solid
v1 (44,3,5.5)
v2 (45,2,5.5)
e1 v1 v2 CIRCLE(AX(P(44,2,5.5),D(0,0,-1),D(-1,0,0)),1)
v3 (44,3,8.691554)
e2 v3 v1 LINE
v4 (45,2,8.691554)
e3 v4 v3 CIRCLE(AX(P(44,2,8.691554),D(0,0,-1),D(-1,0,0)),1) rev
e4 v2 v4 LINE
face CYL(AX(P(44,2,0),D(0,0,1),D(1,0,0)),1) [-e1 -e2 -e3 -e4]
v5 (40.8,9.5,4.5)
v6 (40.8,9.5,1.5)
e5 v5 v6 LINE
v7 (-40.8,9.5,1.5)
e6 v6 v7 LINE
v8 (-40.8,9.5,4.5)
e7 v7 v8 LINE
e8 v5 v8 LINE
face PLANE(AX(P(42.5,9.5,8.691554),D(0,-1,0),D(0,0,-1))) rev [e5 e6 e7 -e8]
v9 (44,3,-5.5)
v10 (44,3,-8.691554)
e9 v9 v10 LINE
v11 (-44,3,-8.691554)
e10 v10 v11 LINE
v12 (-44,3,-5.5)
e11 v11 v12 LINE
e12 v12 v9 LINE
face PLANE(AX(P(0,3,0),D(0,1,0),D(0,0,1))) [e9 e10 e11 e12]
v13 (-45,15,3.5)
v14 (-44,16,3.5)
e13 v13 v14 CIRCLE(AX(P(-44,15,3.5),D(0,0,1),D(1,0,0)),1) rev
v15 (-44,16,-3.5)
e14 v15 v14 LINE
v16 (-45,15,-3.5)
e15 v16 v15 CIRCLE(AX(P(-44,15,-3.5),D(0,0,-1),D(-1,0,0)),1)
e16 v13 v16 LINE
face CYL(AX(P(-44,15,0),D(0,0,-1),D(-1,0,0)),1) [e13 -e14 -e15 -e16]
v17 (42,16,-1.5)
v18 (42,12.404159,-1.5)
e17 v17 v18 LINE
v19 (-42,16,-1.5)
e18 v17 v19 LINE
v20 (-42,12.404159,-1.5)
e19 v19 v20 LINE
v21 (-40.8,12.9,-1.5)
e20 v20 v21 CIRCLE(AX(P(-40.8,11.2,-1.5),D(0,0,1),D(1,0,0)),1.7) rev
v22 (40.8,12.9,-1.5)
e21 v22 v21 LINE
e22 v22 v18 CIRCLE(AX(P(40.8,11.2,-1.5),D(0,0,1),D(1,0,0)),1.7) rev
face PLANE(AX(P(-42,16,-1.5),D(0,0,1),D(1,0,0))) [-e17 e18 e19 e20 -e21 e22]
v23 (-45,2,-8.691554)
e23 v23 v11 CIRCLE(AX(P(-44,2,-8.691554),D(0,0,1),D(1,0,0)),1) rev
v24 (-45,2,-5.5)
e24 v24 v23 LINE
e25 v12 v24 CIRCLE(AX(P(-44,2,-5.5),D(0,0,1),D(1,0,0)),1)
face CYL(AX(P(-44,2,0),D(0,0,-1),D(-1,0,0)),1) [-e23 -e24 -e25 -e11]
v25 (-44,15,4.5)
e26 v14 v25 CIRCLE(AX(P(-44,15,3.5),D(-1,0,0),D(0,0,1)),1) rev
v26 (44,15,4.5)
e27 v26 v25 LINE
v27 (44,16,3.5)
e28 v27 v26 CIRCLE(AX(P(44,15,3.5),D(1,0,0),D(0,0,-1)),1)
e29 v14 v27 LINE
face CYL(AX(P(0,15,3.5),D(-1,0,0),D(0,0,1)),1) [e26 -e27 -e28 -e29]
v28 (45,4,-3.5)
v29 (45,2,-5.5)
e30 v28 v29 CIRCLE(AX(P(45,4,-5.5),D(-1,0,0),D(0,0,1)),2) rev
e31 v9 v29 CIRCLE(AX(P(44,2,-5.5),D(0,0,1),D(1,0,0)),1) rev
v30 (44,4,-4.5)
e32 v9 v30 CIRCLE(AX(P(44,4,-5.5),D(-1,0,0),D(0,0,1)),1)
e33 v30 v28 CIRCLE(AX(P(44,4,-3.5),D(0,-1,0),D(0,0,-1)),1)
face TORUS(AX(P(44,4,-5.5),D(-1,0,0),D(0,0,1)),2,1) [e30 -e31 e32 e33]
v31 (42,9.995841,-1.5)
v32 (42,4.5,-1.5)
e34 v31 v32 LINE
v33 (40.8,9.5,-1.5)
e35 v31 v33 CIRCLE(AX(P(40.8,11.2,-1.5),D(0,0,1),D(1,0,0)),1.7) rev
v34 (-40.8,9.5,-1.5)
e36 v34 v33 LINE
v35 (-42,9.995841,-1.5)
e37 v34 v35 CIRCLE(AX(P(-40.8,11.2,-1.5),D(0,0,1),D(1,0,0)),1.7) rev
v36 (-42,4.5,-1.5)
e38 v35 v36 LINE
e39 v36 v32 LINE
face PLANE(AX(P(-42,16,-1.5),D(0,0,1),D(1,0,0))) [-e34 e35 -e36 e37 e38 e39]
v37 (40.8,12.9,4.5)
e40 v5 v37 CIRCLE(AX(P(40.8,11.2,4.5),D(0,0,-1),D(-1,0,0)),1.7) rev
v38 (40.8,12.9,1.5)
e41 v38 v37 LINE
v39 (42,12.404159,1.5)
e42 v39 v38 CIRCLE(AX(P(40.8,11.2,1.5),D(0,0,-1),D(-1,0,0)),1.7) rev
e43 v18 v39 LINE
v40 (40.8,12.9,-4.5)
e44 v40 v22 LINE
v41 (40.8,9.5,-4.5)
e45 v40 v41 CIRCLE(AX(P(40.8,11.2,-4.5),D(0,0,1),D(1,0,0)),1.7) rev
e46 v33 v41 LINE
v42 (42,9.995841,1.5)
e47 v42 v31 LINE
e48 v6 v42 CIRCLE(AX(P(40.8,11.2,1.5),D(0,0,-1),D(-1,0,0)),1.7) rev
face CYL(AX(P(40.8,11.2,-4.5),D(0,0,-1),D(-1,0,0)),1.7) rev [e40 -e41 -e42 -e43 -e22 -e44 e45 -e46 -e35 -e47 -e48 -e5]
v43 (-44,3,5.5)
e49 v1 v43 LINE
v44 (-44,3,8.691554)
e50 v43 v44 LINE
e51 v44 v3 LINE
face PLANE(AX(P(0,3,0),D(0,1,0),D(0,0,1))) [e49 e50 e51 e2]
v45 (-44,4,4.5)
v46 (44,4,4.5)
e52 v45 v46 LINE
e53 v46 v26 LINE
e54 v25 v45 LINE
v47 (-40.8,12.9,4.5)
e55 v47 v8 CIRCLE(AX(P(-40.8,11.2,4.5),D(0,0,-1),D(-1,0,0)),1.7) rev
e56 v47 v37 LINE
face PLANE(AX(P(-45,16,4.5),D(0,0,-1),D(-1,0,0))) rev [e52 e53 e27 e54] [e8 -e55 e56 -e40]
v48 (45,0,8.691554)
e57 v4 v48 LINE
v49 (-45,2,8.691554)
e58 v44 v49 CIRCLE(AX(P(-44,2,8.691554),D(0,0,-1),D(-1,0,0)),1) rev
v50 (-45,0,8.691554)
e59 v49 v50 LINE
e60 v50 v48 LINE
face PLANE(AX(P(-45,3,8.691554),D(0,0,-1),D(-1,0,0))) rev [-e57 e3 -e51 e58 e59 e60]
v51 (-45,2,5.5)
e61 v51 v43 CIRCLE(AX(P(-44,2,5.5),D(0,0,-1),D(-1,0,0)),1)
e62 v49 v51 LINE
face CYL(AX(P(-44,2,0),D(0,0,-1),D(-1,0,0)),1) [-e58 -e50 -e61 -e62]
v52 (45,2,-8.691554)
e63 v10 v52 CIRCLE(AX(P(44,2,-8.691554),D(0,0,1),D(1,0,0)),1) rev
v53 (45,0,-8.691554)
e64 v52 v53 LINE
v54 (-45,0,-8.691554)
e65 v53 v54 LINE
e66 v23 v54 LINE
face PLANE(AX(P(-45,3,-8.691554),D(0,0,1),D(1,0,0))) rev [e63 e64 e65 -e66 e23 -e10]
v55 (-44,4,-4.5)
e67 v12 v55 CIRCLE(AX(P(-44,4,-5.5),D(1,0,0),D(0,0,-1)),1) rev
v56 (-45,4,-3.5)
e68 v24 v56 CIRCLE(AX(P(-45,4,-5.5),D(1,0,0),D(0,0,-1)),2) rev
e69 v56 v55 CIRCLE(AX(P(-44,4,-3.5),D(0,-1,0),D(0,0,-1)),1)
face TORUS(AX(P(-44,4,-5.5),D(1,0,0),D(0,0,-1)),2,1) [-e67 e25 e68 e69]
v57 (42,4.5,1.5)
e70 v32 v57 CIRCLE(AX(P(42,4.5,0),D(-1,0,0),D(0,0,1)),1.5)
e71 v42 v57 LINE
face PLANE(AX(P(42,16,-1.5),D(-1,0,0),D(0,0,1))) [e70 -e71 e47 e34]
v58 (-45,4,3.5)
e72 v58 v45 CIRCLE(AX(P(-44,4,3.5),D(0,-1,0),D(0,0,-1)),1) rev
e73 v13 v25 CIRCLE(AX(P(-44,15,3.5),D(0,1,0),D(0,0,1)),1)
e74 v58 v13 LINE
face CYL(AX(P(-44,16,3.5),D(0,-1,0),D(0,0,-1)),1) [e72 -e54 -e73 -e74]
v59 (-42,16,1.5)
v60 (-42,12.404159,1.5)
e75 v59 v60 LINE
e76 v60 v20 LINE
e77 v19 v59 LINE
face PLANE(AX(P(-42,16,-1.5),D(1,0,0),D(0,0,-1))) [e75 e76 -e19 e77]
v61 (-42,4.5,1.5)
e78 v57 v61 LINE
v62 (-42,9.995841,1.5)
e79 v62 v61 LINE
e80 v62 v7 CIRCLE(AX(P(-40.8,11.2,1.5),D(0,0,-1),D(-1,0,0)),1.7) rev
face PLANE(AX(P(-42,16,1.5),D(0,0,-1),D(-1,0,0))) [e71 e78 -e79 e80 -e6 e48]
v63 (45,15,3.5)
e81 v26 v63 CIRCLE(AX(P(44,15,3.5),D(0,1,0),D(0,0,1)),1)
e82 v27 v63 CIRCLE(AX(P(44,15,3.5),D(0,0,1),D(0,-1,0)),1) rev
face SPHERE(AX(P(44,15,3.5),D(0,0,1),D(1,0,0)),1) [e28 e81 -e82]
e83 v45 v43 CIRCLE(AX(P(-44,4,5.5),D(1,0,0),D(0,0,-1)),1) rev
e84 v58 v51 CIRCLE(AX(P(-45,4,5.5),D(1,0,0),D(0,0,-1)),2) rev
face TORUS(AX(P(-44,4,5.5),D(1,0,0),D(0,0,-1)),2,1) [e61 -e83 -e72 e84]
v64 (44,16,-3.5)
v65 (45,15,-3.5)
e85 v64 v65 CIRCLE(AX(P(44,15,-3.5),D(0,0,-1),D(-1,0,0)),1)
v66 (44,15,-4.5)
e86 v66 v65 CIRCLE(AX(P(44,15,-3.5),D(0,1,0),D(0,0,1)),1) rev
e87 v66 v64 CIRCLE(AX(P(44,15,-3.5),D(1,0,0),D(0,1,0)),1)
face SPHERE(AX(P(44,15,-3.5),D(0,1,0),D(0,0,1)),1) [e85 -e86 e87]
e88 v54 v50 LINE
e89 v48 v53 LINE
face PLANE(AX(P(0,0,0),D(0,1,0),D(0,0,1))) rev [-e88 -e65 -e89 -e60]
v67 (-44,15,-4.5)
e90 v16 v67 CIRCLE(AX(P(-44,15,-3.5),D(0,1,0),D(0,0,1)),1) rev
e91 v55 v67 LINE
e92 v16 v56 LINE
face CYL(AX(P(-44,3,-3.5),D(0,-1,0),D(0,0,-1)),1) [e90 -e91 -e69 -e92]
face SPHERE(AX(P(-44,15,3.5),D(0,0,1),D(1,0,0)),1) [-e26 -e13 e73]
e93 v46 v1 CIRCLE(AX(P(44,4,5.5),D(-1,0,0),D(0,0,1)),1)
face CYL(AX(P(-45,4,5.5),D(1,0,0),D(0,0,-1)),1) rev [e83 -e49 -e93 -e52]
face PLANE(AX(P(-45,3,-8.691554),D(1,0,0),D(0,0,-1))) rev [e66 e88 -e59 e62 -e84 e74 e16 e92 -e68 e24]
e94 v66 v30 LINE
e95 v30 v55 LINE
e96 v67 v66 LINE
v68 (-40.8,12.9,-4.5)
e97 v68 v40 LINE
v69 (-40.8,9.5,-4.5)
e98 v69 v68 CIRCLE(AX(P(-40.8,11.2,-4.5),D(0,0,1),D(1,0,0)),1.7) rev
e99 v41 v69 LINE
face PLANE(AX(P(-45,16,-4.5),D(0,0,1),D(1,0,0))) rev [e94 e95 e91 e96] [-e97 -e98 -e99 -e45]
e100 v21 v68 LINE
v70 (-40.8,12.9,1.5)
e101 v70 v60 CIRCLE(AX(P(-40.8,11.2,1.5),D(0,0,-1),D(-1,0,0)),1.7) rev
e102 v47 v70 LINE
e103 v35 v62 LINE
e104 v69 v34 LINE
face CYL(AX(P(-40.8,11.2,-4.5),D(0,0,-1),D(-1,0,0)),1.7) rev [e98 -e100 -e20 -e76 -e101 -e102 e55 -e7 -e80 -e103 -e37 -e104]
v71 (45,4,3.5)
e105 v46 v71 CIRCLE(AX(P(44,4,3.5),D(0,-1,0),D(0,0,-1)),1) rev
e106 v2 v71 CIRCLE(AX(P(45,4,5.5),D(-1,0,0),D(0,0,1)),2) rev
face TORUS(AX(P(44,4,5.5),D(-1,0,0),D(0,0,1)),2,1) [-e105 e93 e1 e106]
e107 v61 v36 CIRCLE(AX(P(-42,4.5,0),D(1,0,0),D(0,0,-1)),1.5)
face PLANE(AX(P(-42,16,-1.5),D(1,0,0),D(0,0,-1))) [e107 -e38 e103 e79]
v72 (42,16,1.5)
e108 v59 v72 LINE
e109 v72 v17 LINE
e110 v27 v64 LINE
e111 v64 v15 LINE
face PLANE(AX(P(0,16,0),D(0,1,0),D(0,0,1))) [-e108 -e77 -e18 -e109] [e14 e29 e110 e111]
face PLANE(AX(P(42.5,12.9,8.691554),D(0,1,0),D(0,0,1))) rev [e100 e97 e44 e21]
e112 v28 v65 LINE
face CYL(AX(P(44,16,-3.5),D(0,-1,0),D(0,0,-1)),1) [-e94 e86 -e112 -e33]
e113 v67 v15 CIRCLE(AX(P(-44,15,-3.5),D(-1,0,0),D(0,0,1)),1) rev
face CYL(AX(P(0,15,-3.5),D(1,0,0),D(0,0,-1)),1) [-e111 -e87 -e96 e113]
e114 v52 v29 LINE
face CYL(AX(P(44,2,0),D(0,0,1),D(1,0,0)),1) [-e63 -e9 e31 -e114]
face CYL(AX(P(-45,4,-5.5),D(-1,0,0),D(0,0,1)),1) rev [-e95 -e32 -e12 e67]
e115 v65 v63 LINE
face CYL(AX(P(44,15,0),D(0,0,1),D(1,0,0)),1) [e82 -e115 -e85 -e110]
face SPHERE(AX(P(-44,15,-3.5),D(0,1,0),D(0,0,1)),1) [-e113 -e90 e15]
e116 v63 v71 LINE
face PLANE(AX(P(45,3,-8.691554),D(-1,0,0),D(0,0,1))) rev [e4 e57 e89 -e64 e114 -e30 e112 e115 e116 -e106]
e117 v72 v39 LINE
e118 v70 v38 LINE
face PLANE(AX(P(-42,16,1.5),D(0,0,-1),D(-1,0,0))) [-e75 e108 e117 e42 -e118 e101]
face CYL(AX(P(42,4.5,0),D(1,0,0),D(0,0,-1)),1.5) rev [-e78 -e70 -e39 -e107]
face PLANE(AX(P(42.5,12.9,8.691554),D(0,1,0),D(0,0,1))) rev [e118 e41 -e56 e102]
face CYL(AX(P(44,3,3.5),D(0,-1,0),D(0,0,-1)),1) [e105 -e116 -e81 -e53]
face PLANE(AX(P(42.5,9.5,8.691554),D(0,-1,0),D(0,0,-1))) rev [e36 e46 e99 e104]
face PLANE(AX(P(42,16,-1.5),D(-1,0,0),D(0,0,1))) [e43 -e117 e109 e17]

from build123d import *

# Parameters (mm, degrees)
SKETCH2_W           = 90
SKETCH2_H           = 17.38310799
BOSS_EXTRUDE1_DEPTH = 3
SKETCH5_W           = 90
SKETCH5_H           = 9
SKETCH5_W_2         = 84
SKETCH5_H_2         = 3
BOSS_EXTRUDE2_DEPTH = 13
SKETCH6_W           = 85
SKETCH6_H           = 3.4
CUT_EXTRUDE1_DEPTH  = 50.548129095
FILLET1_R           = 1.5
FILLET4_R           = 1.7
FILLET5_R           = 1.7
FILLET8_R           = 1


# Some blends are built 0.0001 mm under size
with BuildPart() as part:
    # Sketch2 → Boss-Extrude1 (new body)
    with BuildSketch(Plane(origin=(0, 0, 0), x_dir=(1, 0, 0), z_dir=(0, 1, 0))):
        Rectangle(SKETCH2_W, SKETCH2_H)
    extrude(amount=BOSS_EXTRUDE1_DEPTH)

    # Sketch5 → Boss-Extrude2 (add)
    with BuildSketch(Plane(origin=(0, 3, 0), x_dir=(1, 0, 0), z_dir=(0, 1, 0))):
        Rectangle(SKETCH5_W, SKETCH5_H)
        Rectangle(SKETCH5_W_2, SKETCH5_H_2, mode=Mode.SUBTRACT)
    extrude(amount=BOSS_EXTRUDE2_DEPTH)

    # Sketch6 → Cut-Extrude1 (cut, through all)
    with BuildSketch(Plane(origin=(0, 0, -4.5), x_dir=(-1, 0, 0), z_dir=(0, 0, -1))):
        with Locations((0, 11.2)):
            Rectangle(SKETCH6_W, SKETCH6_H)
    extrude(amount=-CUT_EXTRUDE1_DEPTH, mode=Mode.SUBTRACT)

    # Fillet1
    fillet1_edges = [part.edges().sort_by_distance(p)[0] for p in [
        (0, 3, -1.5),
        (0, 3, 1.5),
    ]]
    fillet(fillet1_edges, radius=FILLET1_R - 0.0001)  # a hair under: the kernel refuses the full size

    # Fillet4
    # the kernel refuses this fillet: 1.7 mm, written as the material it adds along each edge
    with BuildSketch(Plane(origin=(42.5, 9.5, -4.5), x_dir=(-1, 0, 0), z_dir=(0, 0, 1))) as fillet4_piece_1_section:
        with BuildLine():
            CenterArc((FILLET4_R, -FILLET4_R), FILLET4_R, 90, 90)
            Line((0, -FILLET4_R), (0, 0))
            Line((0, 0), (FILLET4_R, 0))
        make_face()
    fillet4_piece_1 = extrude(amount=9, mode=Mode.PRIVATE)
    fillet4_piece_1 = split(fillet4_piece_1, bisect_by=Plane(origin=(41.653565017, 9.615018658, -1.5), z_dir=(0, 0, -1)), keep=Keep.TOP, mode=Mode.PRIVATE)
    fillet4_piece_1 = split(fillet4_piece_1, bisect_by=Plane(origin=(42, 9.615018658, -3), z_dir=(-1, 0, 0)), keep=Keep.TOP, mode=Mode.PRIVATE)
    add(fillet4_piece_1)
    with BuildSketch(Plane(origin=(42.5, 9.5, -4.5), x_dir=(-1, 0, 0), z_dir=(0, 0, 1))) as fillet4_piece_2_section:
        with BuildLine():
            CenterArc((FILLET4_R, -FILLET4_R), FILLET4_R, 90, 90)
            Line((0, -FILLET4_R), (0, 0))
            Line((0, 0), (FILLET4_R, 0))
        make_face()
    fillet4_piece_2 = extrude(amount=9, mode=Mode.PRIVATE)
    fillet4_piece_2 = split(fillet4_piece_2, bisect_by=Plane(origin=(42.31915671, 10.004156927, -1.5), z_dir=(0, 0, -1)), keep=Keep.TOP, mode=Mode.PRIVATE)
    fillet4_piece_2 = split(fillet4_piece_2, bisect_by=Plane(origin=(42, 10.004156927, -3), z_dir=(1, 0, 0)), keep=Keep.TOP, mode=Mode.PRIVATE)
    add(fillet4_piece_2)
    with BuildSketch(Plane(origin=(42.5, 9.5, -4.5), x_dir=(-1, 0, 0), z_dir=(0, 0, 1))) as fillet4_piece_3_section:
        with BuildLine():
            CenterArc((FILLET4_R, -FILLET4_R), FILLET4_R, 90, 90)
            Line((0, -FILLET4_R), (0, 0))
            Line((0, 0), (FILLET4_R, 0))
        make_face()
    fillet4_piece_3 = extrude(amount=9, mode=Mode.PRIVATE)
    fillet4_piece_3 = split(fillet4_piece_3, bisect_by=Plane(origin=(42.31915671, 10.004156927, -1.5), z_dir=(0, 0, 1)), keep=Keep.TOP, mode=Mode.PRIVATE)
    fillet4_piece_3 = split(fillet4_piece_3, bisect_by=Plane(origin=(42.31915671, 10.004156927, 1.5), z_dir=(0, 0, -1)), keep=Keep.TOP, mode=Mode.PRIVATE)
    fillet4_piece_3 = split(fillet4_piece_3, bisect_by=Plane(origin=(42, 10.004156927, 0), z_dir=(1, 0, 0)), keep=Keep.TOP, mode=Mode.PRIVATE)
    add(fillet4_piece_3)
    with BuildSketch(Plane(origin=(42.5, 9.5, -4.5), x_dir=(-1, 0, 0), z_dir=(0, 0, 1))) as fillet4_piece_4_section:
        with BuildLine():
            CenterArc((FILLET4_R, -FILLET4_R), FILLET4_R, 90, 90)
            Line((0, -FILLET4_R), (0, 0))
            Line((0, 0), (FILLET4_R, 0))
        make_face()
    fillet4_piece_4 = extrude(amount=9, mode=Mode.PRIVATE)
    fillet4_piece_4 = split(fillet4_piece_4, bisect_by=Plane(origin=(41.653565017, 9.615018658, 1.5), z_dir=(0, 0, 1)), keep=Keep.TOP, mode=Mode.PRIVATE)
    fillet4_piece_4 = split(fillet4_piece_4, bisect_by=Plane(origin=(42, 9.615018658, 3), z_dir=(-1, 0, 0)), keep=Keep.TOP, mode=Mode.PRIVATE)
    add(fillet4_piece_4)
    with BuildSketch(Plane(origin=(42.5, 9.5, -4.5), x_dir=(-1, 0, 0), z_dir=(0, 0, 1))) as fillet4_piece_5_section:
        with BuildLine():
            CenterArc((FILLET4_R, -FILLET4_R), FILLET4_R, 90, 90)
            Line((0, -FILLET4_R), (0, 0))
            Line((0, 0), (FILLET4_R, 0))
        make_face()
    fillet4_piece_5 = extrude(amount=9, mode=Mode.PRIVATE)
    fillet4_piece_5 = split(fillet4_piece_5, bisect_by=Plane(origin=(42.31915671, 10.004156927, 1.5), z_dir=(0, 0, 1)), keep=Keep.TOP, mode=Mode.PRIVATE)
    fillet4_piece_5 = split(fillet4_piece_5, bisect_by=Plane(origin=(42, 10.004156927, 3), z_dir=(1, 0, 0)), keep=Keep.TOP, mode=Mode.PRIVATE)
    add(fillet4_piece_5)
    with BuildSketch(Plane(origin=(42.5, 12.9, -4.5), x_dir=(0, -1, 0), z_dir=(0, 0, 1))) as fillet4_piece_6_section:
        with BuildLine():
            CenterArc((FILLET4_R, -FILLET4_R), FILLET4_R, 90, 90)
            Line((0, -FILLET4_R), (0, 0))
            Line((0, 0), (FILLET4_R, 0))
        make_face()
    fillet4_piece_6 = extrude(amount=9, mode=Mode.PRIVATE)
    fillet4_piece_6 = split(fillet4_piece_6, bisect_by=Plane(origin=(42.31915671, 12.395843073, -1.5), z_dir=(0, 0, -1)), keep=Keep.TOP, mode=Mode.PRIVATE)
    fillet4_piece_6 = split(fillet4_piece_6, bisect_by=Plane(origin=(42, 12.395843073, -3), z_dir=(1, 0, 0)), keep=Keep.TOP, mode=Mode.PRIVATE)
    add(fillet4_piece_6)
    with BuildSketch(Plane(origin=(42.5, 12.9, -4.5), x_dir=(0, -1, 0), z_dir=(0, 0, 1))) as fillet4_piece_7_section:
        with BuildLine():
            CenterArc((FILLET4_R, -FILLET4_R), FILLET4_R, 90, 90)
            Line((0, -FILLET4_R), (0, 0))
            Line((0, 0), (FILLET4_R, 0))
        make_face()
    fillet4_piece_7 = extrude(amount=9, mode=Mode.PRIVATE)
    fillet4_piece_7 = split(fillet4_piece_7, bisect_by=Plane(origin=(41.653565017, 12.784981342, -1.5), z_dir=(0, 0, -1)), keep=Keep.TOP, mode=Mode.PRIVATE)
    fillet4_piece_7 = split(fillet4_piece_7, bisect_by=Plane(origin=(42, 12.784981342, -3), z_dir=(-1, 0, 0)), keep=Keep.TOP, mode=Mode.PRIVATE)
    add(fillet4_piece_7)
    with BuildSketch(Plane(origin=(42.5, 12.9, -4.5), x_dir=(0, -1, 0), z_dir=(0, 0, 1))) as fillet4_piece_8_section:
        with BuildLine():
            CenterArc((FILLET4_R, -FILLET4_R), FILLET4_R, 90, 90)
            Line((0, -FILLET4_R), (0, 0))
            Line((0, 0), (FILLET4_R, 0))
        make_face()
    fillet4_piece_8 = extrude(amount=9, mode=Mode.PRIVATE)
    fillet4_piece_8 = split(fillet4_piece_8, bisect_by=Plane(origin=(42.31915671, 12.395843073, -1.5), z_dir=(0, 0, 1)), keep=Keep.TOP, mode=Mode.PRIVATE)
    fillet4_piece_8 = split(fillet4_piece_8, bisect_by=Plane(origin=(42, 12.395843073, 0), z_dir=(1, 0, 0)), keep=Keep.TOP, mode=Mode.PRIVATE)
    fillet4_piece_8 = split(fillet4_piece_8, bisect_by=Plane(origin=(42.31915671, 12.395843073, 1.5), z_dir=(0, 0, -1)), keep=Keep.TOP, mode=Mode.PRIVATE)
    add(fillet4_piece_8)
    with BuildSketch(Plane(origin=(42.5, 12.9, -4.5), x_dir=(0, -1, 0), z_dir=(0, 0, 1))) as fillet4_piece_9_section:
        with BuildLine():
            CenterArc((FILLET4_R, -FILLET4_R), FILLET4_R, 90, 90)
            Line((0, -FILLET4_R), (0, 0))
            Line((0, 0), (FILLET4_R, 0))
        make_face()
    fillet4_piece_9 = extrude(amount=9, mode=Mode.PRIVATE)
    fillet4_piece_9 = split(fillet4_piece_9, bisect_by=Plane(origin=(42, 12.395843073, 3), z_dir=(1, 0, 0)), keep=Keep.TOP, mode=Mode.PRIVATE)
    fillet4_piece_9 = split(fillet4_piece_9, bisect_by=Plane(origin=(42.31915671, 12.395843073, 1.5), z_dir=(0, 0, 1)), keep=Keep.TOP, mode=Mode.PRIVATE)
    add(fillet4_piece_9)
    with BuildSketch(Plane(origin=(42.5, 12.9, -4.5), x_dir=(0, -1, 0), z_dir=(0, 0, 1))) as fillet4_piece_10_section:
        with BuildLine():
            CenterArc((FILLET4_R, -FILLET4_R), FILLET4_R, 90, 90)
            Line((0, -FILLET4_R), (0, 0))
            Line((0, 0), (FILLET4_R, 0))
        make_face()
    fillet4_piece_10 = extrude(amount=9, mode=Mode.PRIVATE)
    fillet4_piece_10 = split(fillet4_piece_10, bisect_by=Plane(origin=(42, 12.784981342, 3), z_dir=(-1, 0, 0)), keep=Keep.TOP, mode=Mode.PRIVATE)
    fillet4_piece_10 = split(fillet4_piece_10, bisect_by=Plane(origin=(41.653565017, 12.784981342, 1.5), z_dir=(0, 0, 1)), keep=Keep.TOP, mode=Mode.PRIVATE)
    add(fillet4_piece_10)

    # Fillet5
    # the kernel refuses this fillet: 1.7 mm, written as the material it adds along each edge
    with BuildSketch(Plane(origin=(-42.5, 12.9, -4.5), x_dir=(0, -1, 0), z_dir=(0, 0, 1))) as fillet5_piece_1_section:
        with BuildLine():
            CenterArc((FILLET5_R, FILLET5_R), FILLET5_R, 180, 90)
            Line((0, FILLET5_R), (0, 0))
            Line((0, 0), (FILLET5_R, 0))
        make_face()
    fillet5_piece_1 = extrude(amount=9, mode=Mode.PRIVATE)
    fillet5_piece_1 = split(fillet5_piece_1, bisect_by=Plane(origin=(-42, 12.395843073, -3), z_dir=(-1, 0, 0)), keep=Keep.TOP, mode=Mode.PRIVATE)
    fillet5_piece_1 = split(fillet5_piece_1, bisect_by=Plane(origin=(-42.31915671, 12.395843073, -1.5), z_dir=(0, 0, -1)), keep=Keep.TOP, mode=Mode.PRIVATE)
    add(fillet5_piece_1)
    with BuildSketch(Plane(origin=(-42.5, 12.9, -4.5), x_dir=(0, -1, 0), z_dir=(0, 0, 1))) as fillet5_piece_2_section:
        with BuildLine():
            CenterArc((FILLET5_R, FILLET5_R), FILLET5_R, 180, 90)
            Line((0, FILLET5_R), (0, 0))
            Line((0, 0), (FILLET5_R, 0))
        make_face()
    fillet5_piece_2 = extrude(amount=9, mode=Mode.PRIVATE)
    fillet5_piece_2 = split(fillet5_piece_2, bisect_by=Plane(origin=(-42, 12.784981342, -3), z_dir=(1, 0, 0)), keep=Keep.TOP, mode=Mode.PRIVATE)
    fillet5_piece_2 = split(fillet5_piece_2, bisect_by=Plane(origin=(-41.653565017, 12.784981342, -1.5), z_dir=(0, 0, -1)), keep=Keep.TOP, mode=Mode.PRIVATE)
    add(fillet5_piece_2)
    with BuildSketch(Plane(origin=(-42.5, 12.9, -4.5), x_dir=(0, -1, 0), z_dir=(0, 0, 1))) as fillet5_piece_3_section:
        with BuildLine():
            CenterArc((FILLET5_R, FILLET5_R), FILLET5_R, 180, 90)
            Line((0, FILLET5_R), (0, 0))
            Line((0, 0), (FILLET5_R, 0))
        make_face()
    fillet5_piece_3 = extrude(amount=9, mode=Mode.PRIVATE)
    fillet5_piece_3 = split(fillet5_piece_3, bisect_by=Plane(origin=(-42, 12.395843073, 0), z_dir=(-1, 0, 0)), keep=Keep.TOP, mode=Mode.PRIVATE)
    fillet5_piece_3 = split(fillet5_piece_3, bisect_by=Plane(origin=(-42.31915671, 12.395843073, 1.5), z_dir=(0, 0, -1)), keep=Keep.TOP, mode=Mode.PRIVATE)
    fillet5_piece_3 = split(fillet5_piece_3, bisect_by=Plane(origin=(-42.31915671, 12.395843073, -1.5), z_dir=(0, 0, 1)), keep=Keep.TOP, mode=Mode.PRIVATE)
    add(fillet5_piece_3)
    with BuildSketch(Plane(origin=(-42.5, 12.9, -4.5), x_dir=(0, -1, 0), z_dir=(0, 0, 1))) as fillet5_piece_4_section:
        with BuildLine():
            CenterArc((FILLET5_R, FILLET5_R), FILLET5_R, 180, 90)
            Line((0, FILLET5_R), (0, 0))
            Line((0, 0), (FILLET5_R, 0))
        make_face()
    fillet5_piece_4 = extrude(amount=9, mode=Mode.PRIVATE)
    fillet5_piece_4 = split(fillet5_piece_4, bisect_by=Plane(origin=(-42, 12.395843073, 3), z_dir=(-1, 0, 0)), keep=Keep.TOP, mode=Mode.PRIVATE)
    fillet5_piece_4 = split(fillet5_piece_4, bisect_by=Plane(origin=(-42.31915671, 12.395843073, 1.5), z_dir=(0, 0, 1)), keep=Keep.TOP, mode=Mode.PRIVATE)
    add(fillet5_piece_4)
    with BuildSketch(Plane(origin=(-42.5, 12.9, -4.5), x_dir=(0, -1, 0), z_dir=(0, 0, 1))) as fillet5_piece_5_section:
        with BuildLine():
            CenterArc((FILLET5_R, FILLET5_R), FILLET5_R, 180, 90)
            Line((0, FILLET5_R), (0, 0))
            Line((0, 0), (FILLET5_R, 0))
        make_face()
    fillet5_piece_5 = extrude(amount=9, mode=Mode.PRIVATE)
    fillet5_piece_5 = split(fillet5_piece_5, bisect_by=Plane(origin=(-42, 12.784981342, 3), z_dir=(1, 0, 0)), keep=Keep.TOP, mode=Mode.PRIVATE)
    fillet5_piece_5 = split(fillet5_piece_5, bisect_by=Plane(origin=(-41.653565017, 12.784981342, 1.5), z_dir=(0, 0, 1)), keep=Keep.TOP, mode=Mode.PRIVATE)
    add(fillet5_piece_5)
    with BuildSketch(Plane(origin=(-42.5, 9.5, -4.5), x_dir=(0, 1, 0), z_dir=(0, 0, 1))) as fillet5_piece_6_section:
        with BuildLine():
            CenterArc((FILLET5_R, -FILLET5_R), FILLET5_R, 90, 90)
            Line((0, -FILLET5_R), (0, 0))
            Line((0, 0), (FILLET5_R, 0))
        make_face()
    fillet5_piece_6 = extrude(amount=9, mode=Mode.PRIVATE)
    fillet5_piece_6 = split(fillet5_piece_6, bisect_by=Plane(origin=(-42, 10.004156927, -3), z_dir=(-1, 0, 0)), keep=Keep.TOP, mode=Mode.PRIVATE)
    fillet5_piece_6 = split(fillet5_piece_6, bisect_by=Plane(origin=(-42.31915671, 10.004156927, -1.5), z_dir=(0, 0, -1)), keep=Keep.TOP, mode=Mode.PRIVATE)
    add(fillet5_piece_6)
    with BuildSketch(Plane(origin=(-42.5, 9.5, -4.5), x_dir=(0, 1, 0), z_dir=(0, 0, 1))) as fillet5_piece_7_section:
        with BuildLine():
            CenterArc((FILLET5_R, -FILLET5_R), FILLET5_R, 90, 90)
            Line((0, -FILLET5_R), (0, 0))
            Line((0, 0), (FILLET5_R, 0))
        make_face()
    fillet5_piece_7 = extrude(amount=9, mode=Mode.PRIVATE)
    fillet5_piece_7 = split(fillet5_piece_7, bisect_by=Plane(origin=(-42, 9.615018658, -3), z_dir=(1, 0, 0)), keep=Keep.TOP, mode=Mode.PRIVATE)
    fillet5_piece_7 = split(fillet5_piece_7, bisect_by=Plane(origin=(-41.653565017, 9.615018658, -1.5), z_dir=(0, 0, -1)), keep=Keep.TOP, mode=Mode.PRIVATE)
    add(fillet5_piece_7)
    with BuildSketch(Plane(origin=(-42.5, 9.5, -4.5), x_dir=(0, 1, 0), z_dir=(0, 0, 1))) as fillet5_piece_8_section:
        with BuildLine():
            CenterArc((FILLET5_R, -FILLET5_R), FILLET5_R, 90, 90)
            Line((0, -FILLET5_R), (0, 0))
            Line((0, 0), (FILLET5_R, 0))
        make_face()
    fillet5_piece_8 = extrude(amount=9, mode=Mode.PRIVATE)
    fillet5_piece_8 = split(fillet5_piece_8, bisect_by=Plane(origin=(-42.31915671, 10.004156927, 1.5), z_dir=(0, 0, -1)), keep=Keep.TOP, mode=Mode.PRIVATE)
    fillet5_piece_8 = split(fillet5_piece_8, bisect_by=Plane(origin=(-42, 10.004156927, 0), z_dir=(-1, 0, 0)), keep=Keep.TOP, mode=Mode.PRIVATE)
    fillet5_piece_8 = split(fillet5_piece_8, bisect_by=Plane(origin=(-42.31915671, 10.004156927, -1.5), z_dir=(0, 0, 1)), keep=Keep.TOP, mode=Mode.PRIVATE)
    add(fillet5_piece_8)
    with BuildSketch(Plane(origin=(-42.5, 9.5, -4.5), x_dir=(0, 1, 0), z_dir=(0, 0, 1))) as fillet5_piece_9_section:
        with BuildLine():
            CenterArc((FILLET5_R, -FILLET5_R), FILLET5_R, 90, 90)
            Line((0, -FILLET5_R), (0, 0))
            Line((0, 0), (FILLET5_R, 0))
        make_face()
    fillet5_piece_9 = extrude(amount=9, mode=Mode.PRIVATE)
    fillet5_piece_9 = split(fillet5_piece_9, bisect_by=Plane(origin=(-42.31915671, 10.004156927, 1.5), z_dir=(0, 0, 1)), keep=Keep.TOP, mode=Mode.PRIVATE)
    fillet5_piece_9 = split(fillet5_piece_9, bisect_by=Plane(origin=(-42, 10.004156927, 3), z_dir=(-1, 0, 0)), keep=Keep.TOP, mode=Mode.PRIVATE)
    add(fillet5_piece_9)
    with BuildSketch(Plane(origin=(-42.5, 9.5, -4.5), x_dir=(0, 1, 0), z_dir=(0, 0, 1))) as fillet5_piece_10_section:
        with BuildLine():
            CenterArc((FILLET5_R, -FILLET5_R), FILLET5_R, 90, 90)
            Line((0, -FILLET5_R), (0, 0))
            Line((0, 0), (FILLET5_R, 0))
        make_face()
    fillet5_piece_10 = extrude(amount=9, mode=Mode.PRIVATE)
    fillet5_piece_10 = split(fillet5_piece_10, bisect_by=Plane(origin=(-41.653565017, 9.615018658, 1.5), z_dir=(0, 0, 1)), keep=Keep.TOP, mode=Mode.PRIVATE)
    fillet5_piece_10 = split(fillet5_piece_10, bisect_by=Plane(origin=(-42, 9.615018658, 3), z_dir=(1, 0, 0)), keep=Keep.TOP, mode=Mode.PRIVATE)
    add(fillet5_piece_10)

    # Fillet8
    fillet8_edges = [part.edges().sort_by_distance(p)[0] for p in [
        (-45, 3, -6.595776997),
        (45, 3, -6.595776997),
        (-45, 3, 6.595776997),
        (45, 16, 0),
        (0, 16, -4.5),
        (-45, 16, 0),
        (0, 16, 4.5),
        (45, 9.5, 4.5),
        (0, 3, -4.5),
        (45, 9.5, -4.5),
        (-45, 9.5, -4.5),
        (0, 3, 4.5),
        (-45, 9.5, 4.5),
        (45, 3, 6.595776997),
    ]]
    fillet(fillet8_edges, radius=FILLET8_R)


solid = part.part
